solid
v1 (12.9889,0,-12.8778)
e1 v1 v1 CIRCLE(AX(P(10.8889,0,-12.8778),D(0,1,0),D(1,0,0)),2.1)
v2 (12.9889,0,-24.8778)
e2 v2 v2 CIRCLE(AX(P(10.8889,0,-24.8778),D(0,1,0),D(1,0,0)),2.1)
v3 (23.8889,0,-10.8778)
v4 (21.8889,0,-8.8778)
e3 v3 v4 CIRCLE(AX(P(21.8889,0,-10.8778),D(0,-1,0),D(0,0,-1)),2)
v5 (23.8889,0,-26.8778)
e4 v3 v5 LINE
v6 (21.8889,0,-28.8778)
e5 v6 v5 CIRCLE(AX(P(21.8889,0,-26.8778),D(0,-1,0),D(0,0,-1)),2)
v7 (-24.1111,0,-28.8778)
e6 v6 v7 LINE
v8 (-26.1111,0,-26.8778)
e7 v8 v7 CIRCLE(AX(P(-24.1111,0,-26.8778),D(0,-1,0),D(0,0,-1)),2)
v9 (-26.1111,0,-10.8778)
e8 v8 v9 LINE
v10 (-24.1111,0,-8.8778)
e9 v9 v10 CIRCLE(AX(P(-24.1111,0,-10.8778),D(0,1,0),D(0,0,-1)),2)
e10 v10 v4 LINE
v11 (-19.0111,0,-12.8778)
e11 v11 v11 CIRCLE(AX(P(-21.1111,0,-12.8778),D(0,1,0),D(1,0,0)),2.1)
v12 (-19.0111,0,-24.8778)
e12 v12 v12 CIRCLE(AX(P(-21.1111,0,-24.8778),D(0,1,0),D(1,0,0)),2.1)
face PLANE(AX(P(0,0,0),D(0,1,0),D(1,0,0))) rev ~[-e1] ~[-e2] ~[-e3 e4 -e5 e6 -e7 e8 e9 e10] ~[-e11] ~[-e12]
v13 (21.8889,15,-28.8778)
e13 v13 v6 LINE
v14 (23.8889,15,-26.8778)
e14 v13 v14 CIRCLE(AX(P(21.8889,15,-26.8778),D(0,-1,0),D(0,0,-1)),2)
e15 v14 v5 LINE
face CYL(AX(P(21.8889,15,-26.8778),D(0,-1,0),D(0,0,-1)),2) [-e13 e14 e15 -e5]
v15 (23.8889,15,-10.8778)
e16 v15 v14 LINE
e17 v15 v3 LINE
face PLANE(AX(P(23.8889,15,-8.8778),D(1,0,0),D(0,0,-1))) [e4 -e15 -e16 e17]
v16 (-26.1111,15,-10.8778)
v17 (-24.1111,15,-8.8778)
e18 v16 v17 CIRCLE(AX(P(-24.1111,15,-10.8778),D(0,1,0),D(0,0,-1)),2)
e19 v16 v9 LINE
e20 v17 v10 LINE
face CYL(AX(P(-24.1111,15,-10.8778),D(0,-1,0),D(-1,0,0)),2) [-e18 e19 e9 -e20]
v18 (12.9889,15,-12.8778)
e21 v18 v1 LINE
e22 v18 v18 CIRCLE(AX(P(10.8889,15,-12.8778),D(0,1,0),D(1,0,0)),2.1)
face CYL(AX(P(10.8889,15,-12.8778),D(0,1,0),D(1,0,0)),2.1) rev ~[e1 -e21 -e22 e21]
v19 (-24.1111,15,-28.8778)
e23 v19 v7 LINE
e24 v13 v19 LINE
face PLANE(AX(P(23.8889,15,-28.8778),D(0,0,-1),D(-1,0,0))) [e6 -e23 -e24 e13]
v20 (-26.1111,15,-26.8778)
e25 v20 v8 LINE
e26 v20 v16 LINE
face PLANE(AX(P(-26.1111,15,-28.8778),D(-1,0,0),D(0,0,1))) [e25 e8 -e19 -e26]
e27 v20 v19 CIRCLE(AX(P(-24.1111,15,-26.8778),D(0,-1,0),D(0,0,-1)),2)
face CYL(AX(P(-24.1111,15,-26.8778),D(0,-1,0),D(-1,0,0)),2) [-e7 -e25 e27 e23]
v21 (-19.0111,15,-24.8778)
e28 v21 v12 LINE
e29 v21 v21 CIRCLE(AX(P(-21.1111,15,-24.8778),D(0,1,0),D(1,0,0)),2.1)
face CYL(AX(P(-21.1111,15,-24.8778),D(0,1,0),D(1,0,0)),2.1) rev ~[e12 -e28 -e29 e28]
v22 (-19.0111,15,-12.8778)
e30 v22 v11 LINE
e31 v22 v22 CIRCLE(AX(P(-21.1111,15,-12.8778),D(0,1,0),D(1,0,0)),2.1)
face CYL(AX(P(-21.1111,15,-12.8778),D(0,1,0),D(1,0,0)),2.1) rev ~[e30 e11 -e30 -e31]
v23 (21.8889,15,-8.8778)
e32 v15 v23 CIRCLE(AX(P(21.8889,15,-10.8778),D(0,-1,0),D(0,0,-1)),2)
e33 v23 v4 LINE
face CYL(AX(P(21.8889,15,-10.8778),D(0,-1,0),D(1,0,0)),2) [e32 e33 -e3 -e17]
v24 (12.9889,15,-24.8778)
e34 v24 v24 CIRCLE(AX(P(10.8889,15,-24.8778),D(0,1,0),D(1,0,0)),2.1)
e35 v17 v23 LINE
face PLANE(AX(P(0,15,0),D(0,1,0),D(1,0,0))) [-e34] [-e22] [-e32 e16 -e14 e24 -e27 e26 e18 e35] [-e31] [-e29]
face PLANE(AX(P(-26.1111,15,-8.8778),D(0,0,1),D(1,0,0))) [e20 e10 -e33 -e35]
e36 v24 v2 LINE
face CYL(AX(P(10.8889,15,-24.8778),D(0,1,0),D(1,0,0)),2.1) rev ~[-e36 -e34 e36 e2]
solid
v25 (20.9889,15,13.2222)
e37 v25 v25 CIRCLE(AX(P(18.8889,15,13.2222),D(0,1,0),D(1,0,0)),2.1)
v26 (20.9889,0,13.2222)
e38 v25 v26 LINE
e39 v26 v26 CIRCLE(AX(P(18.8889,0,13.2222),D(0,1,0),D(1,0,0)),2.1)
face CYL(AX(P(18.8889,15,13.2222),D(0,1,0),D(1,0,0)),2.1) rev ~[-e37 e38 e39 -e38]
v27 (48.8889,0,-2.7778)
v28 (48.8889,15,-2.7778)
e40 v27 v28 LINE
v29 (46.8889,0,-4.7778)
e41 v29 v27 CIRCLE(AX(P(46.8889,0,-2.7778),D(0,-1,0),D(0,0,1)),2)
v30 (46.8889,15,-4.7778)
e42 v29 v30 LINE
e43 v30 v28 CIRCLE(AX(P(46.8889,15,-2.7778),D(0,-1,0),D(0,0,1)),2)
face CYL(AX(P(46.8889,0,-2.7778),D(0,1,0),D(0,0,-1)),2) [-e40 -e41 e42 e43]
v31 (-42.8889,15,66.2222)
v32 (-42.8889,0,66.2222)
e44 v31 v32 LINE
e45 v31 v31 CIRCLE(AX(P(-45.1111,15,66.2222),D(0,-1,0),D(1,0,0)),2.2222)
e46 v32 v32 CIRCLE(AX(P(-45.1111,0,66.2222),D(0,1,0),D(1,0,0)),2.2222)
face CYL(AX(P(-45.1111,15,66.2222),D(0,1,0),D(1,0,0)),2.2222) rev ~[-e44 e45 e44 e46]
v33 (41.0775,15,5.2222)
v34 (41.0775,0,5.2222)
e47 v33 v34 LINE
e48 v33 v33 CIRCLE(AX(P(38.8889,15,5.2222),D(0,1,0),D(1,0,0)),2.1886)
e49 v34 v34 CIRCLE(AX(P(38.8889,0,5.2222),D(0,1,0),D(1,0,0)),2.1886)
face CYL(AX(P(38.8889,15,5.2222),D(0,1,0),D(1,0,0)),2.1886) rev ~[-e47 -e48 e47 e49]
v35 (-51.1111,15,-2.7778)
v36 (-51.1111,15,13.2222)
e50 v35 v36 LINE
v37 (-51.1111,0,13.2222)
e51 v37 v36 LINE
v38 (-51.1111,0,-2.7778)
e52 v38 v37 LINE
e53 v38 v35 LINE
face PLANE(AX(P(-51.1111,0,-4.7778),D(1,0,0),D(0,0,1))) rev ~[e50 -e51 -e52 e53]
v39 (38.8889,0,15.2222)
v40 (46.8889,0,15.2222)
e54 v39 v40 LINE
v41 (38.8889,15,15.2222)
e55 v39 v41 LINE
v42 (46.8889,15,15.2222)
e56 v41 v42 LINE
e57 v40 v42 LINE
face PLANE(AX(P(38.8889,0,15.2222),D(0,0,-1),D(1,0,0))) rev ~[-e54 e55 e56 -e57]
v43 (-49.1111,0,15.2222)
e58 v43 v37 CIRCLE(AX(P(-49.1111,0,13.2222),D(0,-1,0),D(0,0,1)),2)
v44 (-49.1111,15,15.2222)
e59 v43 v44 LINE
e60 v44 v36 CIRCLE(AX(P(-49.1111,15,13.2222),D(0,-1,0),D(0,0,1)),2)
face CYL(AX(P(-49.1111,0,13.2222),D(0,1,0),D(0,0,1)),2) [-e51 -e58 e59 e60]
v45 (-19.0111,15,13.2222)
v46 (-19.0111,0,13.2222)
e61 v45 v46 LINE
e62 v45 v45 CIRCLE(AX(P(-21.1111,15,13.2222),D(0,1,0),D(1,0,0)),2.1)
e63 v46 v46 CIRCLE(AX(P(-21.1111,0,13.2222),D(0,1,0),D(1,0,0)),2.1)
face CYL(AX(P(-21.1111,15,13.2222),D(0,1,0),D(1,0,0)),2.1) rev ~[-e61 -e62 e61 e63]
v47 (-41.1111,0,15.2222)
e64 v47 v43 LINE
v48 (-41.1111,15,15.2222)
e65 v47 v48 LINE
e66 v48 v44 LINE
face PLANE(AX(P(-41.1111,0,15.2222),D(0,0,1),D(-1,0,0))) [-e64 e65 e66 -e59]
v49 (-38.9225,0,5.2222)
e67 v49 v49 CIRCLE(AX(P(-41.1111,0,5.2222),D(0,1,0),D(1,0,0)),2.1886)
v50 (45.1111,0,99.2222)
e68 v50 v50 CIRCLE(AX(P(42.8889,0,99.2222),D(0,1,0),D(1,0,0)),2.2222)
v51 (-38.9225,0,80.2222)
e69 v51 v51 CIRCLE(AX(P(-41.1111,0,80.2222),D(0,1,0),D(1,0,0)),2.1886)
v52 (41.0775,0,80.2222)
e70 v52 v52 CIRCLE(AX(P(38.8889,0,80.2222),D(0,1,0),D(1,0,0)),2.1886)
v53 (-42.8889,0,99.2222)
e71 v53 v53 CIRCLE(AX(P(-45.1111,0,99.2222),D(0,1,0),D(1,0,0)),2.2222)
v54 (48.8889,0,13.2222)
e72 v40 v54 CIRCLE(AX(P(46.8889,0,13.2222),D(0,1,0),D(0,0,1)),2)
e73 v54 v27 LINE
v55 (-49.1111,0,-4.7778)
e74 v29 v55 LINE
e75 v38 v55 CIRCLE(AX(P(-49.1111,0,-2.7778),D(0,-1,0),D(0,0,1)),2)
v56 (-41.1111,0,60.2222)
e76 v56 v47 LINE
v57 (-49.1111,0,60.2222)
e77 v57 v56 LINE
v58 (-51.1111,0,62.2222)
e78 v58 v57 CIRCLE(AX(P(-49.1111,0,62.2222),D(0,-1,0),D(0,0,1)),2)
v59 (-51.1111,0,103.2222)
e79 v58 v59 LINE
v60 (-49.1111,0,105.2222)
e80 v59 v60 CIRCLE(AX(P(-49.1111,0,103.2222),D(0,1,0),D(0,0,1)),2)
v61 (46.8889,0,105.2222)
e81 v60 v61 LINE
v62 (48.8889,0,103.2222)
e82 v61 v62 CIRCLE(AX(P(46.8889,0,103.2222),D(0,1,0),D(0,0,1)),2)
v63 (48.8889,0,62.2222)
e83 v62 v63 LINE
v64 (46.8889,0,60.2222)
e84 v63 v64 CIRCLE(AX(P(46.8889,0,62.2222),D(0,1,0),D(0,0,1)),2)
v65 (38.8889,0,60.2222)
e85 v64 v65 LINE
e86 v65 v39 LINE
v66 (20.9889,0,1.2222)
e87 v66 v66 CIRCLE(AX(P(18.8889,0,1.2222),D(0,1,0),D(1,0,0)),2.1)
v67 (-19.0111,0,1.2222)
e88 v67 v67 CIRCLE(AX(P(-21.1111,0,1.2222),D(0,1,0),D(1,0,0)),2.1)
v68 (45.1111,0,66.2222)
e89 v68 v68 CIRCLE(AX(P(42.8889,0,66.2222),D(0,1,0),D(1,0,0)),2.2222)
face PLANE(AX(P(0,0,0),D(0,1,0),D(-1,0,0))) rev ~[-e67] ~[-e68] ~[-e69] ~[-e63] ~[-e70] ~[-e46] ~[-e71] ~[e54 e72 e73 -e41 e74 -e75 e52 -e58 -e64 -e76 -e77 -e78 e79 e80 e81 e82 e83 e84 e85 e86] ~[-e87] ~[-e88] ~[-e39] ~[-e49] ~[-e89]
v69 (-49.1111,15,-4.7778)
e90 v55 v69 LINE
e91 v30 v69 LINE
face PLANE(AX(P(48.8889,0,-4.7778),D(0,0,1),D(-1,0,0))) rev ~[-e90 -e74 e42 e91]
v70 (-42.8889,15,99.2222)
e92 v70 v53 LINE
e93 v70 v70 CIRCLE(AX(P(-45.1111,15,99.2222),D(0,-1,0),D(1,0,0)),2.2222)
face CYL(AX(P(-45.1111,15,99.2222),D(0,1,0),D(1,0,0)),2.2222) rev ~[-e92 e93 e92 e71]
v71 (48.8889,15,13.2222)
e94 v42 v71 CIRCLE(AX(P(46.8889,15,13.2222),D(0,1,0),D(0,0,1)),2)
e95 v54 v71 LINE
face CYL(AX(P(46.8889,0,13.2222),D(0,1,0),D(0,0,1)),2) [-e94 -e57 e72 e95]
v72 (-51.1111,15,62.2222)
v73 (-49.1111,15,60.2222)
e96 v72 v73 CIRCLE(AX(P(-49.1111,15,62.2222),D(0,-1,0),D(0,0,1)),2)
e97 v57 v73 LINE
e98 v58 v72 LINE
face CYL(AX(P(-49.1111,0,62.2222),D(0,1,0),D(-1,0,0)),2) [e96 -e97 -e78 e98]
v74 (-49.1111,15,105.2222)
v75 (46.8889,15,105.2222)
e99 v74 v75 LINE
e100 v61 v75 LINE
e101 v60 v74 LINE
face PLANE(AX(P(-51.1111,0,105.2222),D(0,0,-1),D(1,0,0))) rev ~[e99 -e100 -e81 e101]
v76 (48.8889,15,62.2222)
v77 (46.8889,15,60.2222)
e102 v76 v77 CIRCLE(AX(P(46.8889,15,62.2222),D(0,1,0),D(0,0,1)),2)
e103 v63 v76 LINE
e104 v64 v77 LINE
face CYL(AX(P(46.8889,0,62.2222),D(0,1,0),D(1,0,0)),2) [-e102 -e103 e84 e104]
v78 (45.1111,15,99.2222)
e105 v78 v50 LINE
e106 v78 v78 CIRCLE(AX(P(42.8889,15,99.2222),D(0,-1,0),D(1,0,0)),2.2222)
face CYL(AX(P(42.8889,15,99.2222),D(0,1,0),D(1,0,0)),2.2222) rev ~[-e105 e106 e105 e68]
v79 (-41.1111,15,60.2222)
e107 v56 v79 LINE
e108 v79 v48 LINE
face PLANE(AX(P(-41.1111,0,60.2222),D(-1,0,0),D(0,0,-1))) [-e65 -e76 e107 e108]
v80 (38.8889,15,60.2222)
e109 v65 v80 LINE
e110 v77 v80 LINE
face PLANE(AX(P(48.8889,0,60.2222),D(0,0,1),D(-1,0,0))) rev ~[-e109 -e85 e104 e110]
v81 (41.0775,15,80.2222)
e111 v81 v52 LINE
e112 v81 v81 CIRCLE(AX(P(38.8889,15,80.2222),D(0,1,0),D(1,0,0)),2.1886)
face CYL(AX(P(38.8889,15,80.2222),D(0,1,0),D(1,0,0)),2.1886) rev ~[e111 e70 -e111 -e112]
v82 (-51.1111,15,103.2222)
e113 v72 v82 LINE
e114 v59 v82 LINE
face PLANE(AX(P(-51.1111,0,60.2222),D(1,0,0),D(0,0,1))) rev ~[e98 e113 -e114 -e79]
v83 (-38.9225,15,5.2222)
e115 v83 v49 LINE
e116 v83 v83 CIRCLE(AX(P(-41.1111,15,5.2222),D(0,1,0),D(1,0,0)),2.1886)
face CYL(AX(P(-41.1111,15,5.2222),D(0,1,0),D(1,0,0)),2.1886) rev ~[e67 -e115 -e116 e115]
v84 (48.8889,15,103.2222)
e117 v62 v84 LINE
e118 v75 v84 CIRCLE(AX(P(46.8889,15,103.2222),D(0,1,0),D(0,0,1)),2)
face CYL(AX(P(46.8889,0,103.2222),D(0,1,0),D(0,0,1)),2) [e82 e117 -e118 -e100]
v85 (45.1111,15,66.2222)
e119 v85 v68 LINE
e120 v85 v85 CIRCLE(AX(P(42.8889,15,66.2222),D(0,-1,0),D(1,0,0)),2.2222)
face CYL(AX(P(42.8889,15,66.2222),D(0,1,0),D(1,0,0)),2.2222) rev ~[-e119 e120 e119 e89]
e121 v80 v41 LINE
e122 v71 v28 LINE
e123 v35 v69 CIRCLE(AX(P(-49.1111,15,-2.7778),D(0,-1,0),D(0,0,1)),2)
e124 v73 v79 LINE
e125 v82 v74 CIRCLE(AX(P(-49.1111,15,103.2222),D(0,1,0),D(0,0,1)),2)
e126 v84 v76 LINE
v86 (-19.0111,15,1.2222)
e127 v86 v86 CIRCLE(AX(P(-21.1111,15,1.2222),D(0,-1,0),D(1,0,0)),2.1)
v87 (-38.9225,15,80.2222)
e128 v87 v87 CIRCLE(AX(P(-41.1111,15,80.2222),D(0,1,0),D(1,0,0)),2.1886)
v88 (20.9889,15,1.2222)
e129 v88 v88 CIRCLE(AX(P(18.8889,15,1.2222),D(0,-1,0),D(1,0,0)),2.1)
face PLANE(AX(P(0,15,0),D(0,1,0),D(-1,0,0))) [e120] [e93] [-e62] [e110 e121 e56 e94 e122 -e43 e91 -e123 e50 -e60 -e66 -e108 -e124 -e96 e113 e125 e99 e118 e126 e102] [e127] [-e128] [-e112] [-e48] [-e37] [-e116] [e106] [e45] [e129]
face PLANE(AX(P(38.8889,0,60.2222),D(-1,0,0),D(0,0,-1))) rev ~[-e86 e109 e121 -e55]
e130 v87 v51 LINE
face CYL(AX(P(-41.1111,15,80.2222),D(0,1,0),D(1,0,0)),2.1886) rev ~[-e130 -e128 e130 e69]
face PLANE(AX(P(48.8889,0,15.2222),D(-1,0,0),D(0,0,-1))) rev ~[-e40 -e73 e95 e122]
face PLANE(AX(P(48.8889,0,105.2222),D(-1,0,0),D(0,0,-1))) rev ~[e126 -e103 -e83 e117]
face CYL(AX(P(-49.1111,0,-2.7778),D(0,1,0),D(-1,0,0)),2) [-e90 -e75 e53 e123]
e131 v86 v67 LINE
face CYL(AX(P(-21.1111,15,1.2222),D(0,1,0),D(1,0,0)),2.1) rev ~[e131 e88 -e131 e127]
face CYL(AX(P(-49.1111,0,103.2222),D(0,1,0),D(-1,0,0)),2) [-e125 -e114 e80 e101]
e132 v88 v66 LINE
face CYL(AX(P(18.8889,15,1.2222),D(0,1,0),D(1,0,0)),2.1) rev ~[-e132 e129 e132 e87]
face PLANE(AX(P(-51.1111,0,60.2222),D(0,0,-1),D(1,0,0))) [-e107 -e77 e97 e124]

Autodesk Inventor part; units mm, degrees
ref_plane "YZ Plane" through (0, 0, 0) normal (1, 0, 0) x (0, 1, 0)
ref_plane "XZ Plane" through (0, 0, 0) normal (0, 1, 0) x (-1, 0, 0)
ref_plane "XY Plane" through (0, 0, 0) normal (0, 0, 1) x (1, 0, 0)
sketch "Sketch1" plane through (0, 0, 0) normal (0, 1, 0) x (-1, 0, 0)
  line L0 (51.1111, 105.2222) -> (-48.8889, 105.2222)
  line L1 (-48.8889, 105.2222) -> (-48.8889, -4.7778)
  line L2 (-48.8889, -4.7778) -> (51.1111, -4.7778)
  line L3 (51.1111, -4.7778) -> (51.1111, 105.2222)
  line L4 (52.6672, 60.2222) -> (41.1111, 60.2222)
  line L5 (41.1111, 60.2222) -> (41.1111, 15.2222)
  line L6 (41.1111, 15.2222) -> (52.6672, 15.2222)
  line L7 (52.6672, 15.2222) -> (52.6672, 60.2222)
  line L8 (-66.472, 60.2222) -> (-38.8889, 60.2222)
  line L9 (-38.8889, 60.2222) -> (-38.8889, 15.2222)
  line L10 (-38.8889, 15.2222) -> (-66.472, 15.2222)
  line L11 (-66.472, 15.2222) -> (-66.472, 60.2222)
  point P0 (0, 0)
  point P1 (-48.8889, 60.2222)
  point P2 (-48.8889, 15.2222)
  point P3 (51.1111, 15.2222)
  point P4 (51.1111, 60.2222)
  dimension "d0" = 100
  dimension "d1" = 110
  dimension "d6" = 20
  dimension "d7" = 20
  dimension "d8" = 10
  dimension "d9" = 10
  dimension "d10" = 45
  dimension "d11" = 45
extrude "Extrusion1" add sketch "Sketch1" along normal blind 15 contours L3 L4 L5 L6 L2 L1 L10 L9 L8 L0
sketch "Sketch2" plane through (0, 15, 0) normal (0, 1, 0) x (1, 0, 0)
  point P0 (0, 0)
sketch "Sketch3" plane through (0, 15, 0) normal (0, 1, 0) x (1, 0, 0)
  point P0 (0, 0)
sketch "Sketch4" plane through (0, 15, 0) normal (0, 1, 0) x (1, 0, 0)
  line L0 (48.8889, -105.2222) -> (48.8889, -60.2222) projected
  line L1 (48.8889, -60.2222) -> (38.8889, -60.2222) projected
  line L2 (38.8889, -60.2222) -> (38.8889, -15.2222) projected
  line L3 (38.8889, -15.2222) -> (48.8889, -15.2222) projected
  line L4 (48.8889, -15.2222) -> (48.8889, 4.7778) projected
  line L5 (48.8889, 4.7778) -> (-51.1111, 4.7778) projected
  line L6 (-51.1111, 4.7778) -> (-51.1111, -15.2222) projected
  line L7 (-51.1111, -15.2222) -> (-41.1111, -15.2222) projected
  line L8 (-41.1111, -15.2222) -> (-41.1111, -60.2222) projected
  line L9 (-41.1111, -60.2222) -> (-51.1111, -60.2222) projected
  line L10 (-51.1111, -60.2222) -> (-51.1111, -105.2222) projected
  line L11 (-51.1111, -105.2222) -> (48.8889, -105.2222) projected
  circle A0 centre (-41.1111, -5.2222) radius 10
  circle A1 centre (38.8889, -5.2222) radius 10
  circle A2 centre (-41.1111, -80.2222) radius 10
  circle A3 centre (38.8889, -80.2222) radius 10
  circle A4 centre (-41.1111, -80.2222) radius 2.1886
  circle A5 centre (38.8889, -80.2222) radius 2.1886
  circle A6 centre (-41.1111, -5.2222) radius 2.1886
  circle A7 centre (38.8889, -5.2222) radius 2.1886
  circle A8 centre (-21.1111, -13.2222) radius 2.1
  circle A9 centre (18.8889, -13.2222) radius 2.1
  line L12 (-45.1111, -99.2222) -> (-45.1111, -66.2222)
  line L13 (-45.1111, -66.2222) -> (-35.1111, -66.2222)
  line L14 (-35.1111, -66.2222) -> (-35.1111, -9.2222)
  line L15 (-35.1111, -9.2222) -> (-45.1111, -9.2222)
  line L16 (-45.1111, -9.2222) -> (-45.1111, -1.2222)
  line L17 (-45.1111, -1.2222) -> (42.8889, -1.2222)
  line L18 (42.8889, -1.2222) -> (42.8889, -9.2222)
  line L19 (42.8889, -9.2222) -> (32.8889, -9.2222)
  line L20 (32.8889, -9.2222) -> (32.8889, -66.2222)
  line L21 (32.8889, -66.2222) -> (42.8889, -66.2222)
  line L22 (42.8889, -66.2222) -> (42.8889, -99.2222)
  line L23 (42.8889, -99.2222) -> (-45.1111, -99.2222)
  circle A10 centre (-45.1111, -66.2222) radius 2.2222
  circle A11 centre (42.8889, -66.2222) radius 2.2222
  circle A12 centre (42.8889, -99.2222) radius 2.2222
  circle A13 centre (-45.1111, -99.2222) radius 2.2222
  circle A14 centre (-21.1111, -1.2222) radius 2.1
  circle A15 centre (18.8889, -1.2222) radius 2.1
  point P0 (0, 0)
  dimension "d19" = 20
  dimension "d20" = 20
  dimension "d21" = 10
  dimension "d22" = 10
  dimension "d23" = 18
  dimension "d24" = 18
  dimension "d25" = 20
  dimension "d26" = 20
  dimension "d27" = 4.2
  dimension "d28" = 4.2
  dimension "d29" = 6
  dimension "d38" = 12
  dimension "d39" = 12
extrude "Extrusion2" cut sketch "Sketch4" against normal blind 15 contours A11 L21 L22 | L22 L21 A11 | A12 L23 L22 | L22 L23 A12 | A10 L13 L12 | L12 L13 A10 | A13 L23 L12 | L12 L23 A13 | A15 L17 | L17 A15 | A14 L17 | L17 A14 | A4 | A5 | A6 | A7 | A8 | A9
sketch "Sketch6" plane through (0, 15, 0) normal (0, 1, 0) x (1, 0, 0)
  line L0 (-26.1111, 8.8778) -> (23.8889, 8.8778)
  line L1 (23.8889, 8.8778) -> (23.8889, 28.8778)
  line L2 (23.8889, 28.8778) -> (-26.1111, 28.8778)
  line L3 (-26.1111, 28.8778) -> (-26.1111, 8.8778)
  line L4 (-51.1111, 4.7778) -> (-51.1111, -15.2222) projected
  line L5 (48.8889, -15.2222) -> (48.8889, 4.7778) projected
  line L6 (48.8889, 4.7778) -> (-51.1111, 4.7778) projected
  circle A0 centre (-21.1111, 24.8778) radius 2.1
  circle A1 centre (10.8889, 24.8778) radius 2.1
  circle A2 centre (-21.1111, 12.8778) radius 2.1
  circle A3 centre (10.8889, 12.8778) radius 2.1
  point P0 (0, 0)
  point P1 (-51.1111, -5.2222)
  dimension "d30" = 25
  dimension "d31" = 25
  dimension "d32" = 4.1
  dimension "d33" = 20
  dimension "d34" = 4
  dimension "d35" = 4
  dimension "d36" = 4
  dimension "d37" = 4
extrude "Extrusion4" add sketch "Sketch6" against normal blind 15
fillet "Fillet1" radius 2 12 edges at (48.8889, 7.5, 60.2222) (48.8889, 7.5, 15.2222) (23.8889, 7.5, -8.8778) (23.8889, 7.5, -28.8778) (-26.1111, 7.5, -28.8778) (-26.1111, 7.5, -8.8778) (-51.1111, 7.5, -4.7778) (-51.1111, 7.5, 15.2222) (-51.1111, 7.5, 60.2222) (-51.1111, 7.5, 105.2222) (48.8889, 7.5, 105.2222) (48.8889, 7.5, -4.7778)
properties part number "DerzavkaDviz"
